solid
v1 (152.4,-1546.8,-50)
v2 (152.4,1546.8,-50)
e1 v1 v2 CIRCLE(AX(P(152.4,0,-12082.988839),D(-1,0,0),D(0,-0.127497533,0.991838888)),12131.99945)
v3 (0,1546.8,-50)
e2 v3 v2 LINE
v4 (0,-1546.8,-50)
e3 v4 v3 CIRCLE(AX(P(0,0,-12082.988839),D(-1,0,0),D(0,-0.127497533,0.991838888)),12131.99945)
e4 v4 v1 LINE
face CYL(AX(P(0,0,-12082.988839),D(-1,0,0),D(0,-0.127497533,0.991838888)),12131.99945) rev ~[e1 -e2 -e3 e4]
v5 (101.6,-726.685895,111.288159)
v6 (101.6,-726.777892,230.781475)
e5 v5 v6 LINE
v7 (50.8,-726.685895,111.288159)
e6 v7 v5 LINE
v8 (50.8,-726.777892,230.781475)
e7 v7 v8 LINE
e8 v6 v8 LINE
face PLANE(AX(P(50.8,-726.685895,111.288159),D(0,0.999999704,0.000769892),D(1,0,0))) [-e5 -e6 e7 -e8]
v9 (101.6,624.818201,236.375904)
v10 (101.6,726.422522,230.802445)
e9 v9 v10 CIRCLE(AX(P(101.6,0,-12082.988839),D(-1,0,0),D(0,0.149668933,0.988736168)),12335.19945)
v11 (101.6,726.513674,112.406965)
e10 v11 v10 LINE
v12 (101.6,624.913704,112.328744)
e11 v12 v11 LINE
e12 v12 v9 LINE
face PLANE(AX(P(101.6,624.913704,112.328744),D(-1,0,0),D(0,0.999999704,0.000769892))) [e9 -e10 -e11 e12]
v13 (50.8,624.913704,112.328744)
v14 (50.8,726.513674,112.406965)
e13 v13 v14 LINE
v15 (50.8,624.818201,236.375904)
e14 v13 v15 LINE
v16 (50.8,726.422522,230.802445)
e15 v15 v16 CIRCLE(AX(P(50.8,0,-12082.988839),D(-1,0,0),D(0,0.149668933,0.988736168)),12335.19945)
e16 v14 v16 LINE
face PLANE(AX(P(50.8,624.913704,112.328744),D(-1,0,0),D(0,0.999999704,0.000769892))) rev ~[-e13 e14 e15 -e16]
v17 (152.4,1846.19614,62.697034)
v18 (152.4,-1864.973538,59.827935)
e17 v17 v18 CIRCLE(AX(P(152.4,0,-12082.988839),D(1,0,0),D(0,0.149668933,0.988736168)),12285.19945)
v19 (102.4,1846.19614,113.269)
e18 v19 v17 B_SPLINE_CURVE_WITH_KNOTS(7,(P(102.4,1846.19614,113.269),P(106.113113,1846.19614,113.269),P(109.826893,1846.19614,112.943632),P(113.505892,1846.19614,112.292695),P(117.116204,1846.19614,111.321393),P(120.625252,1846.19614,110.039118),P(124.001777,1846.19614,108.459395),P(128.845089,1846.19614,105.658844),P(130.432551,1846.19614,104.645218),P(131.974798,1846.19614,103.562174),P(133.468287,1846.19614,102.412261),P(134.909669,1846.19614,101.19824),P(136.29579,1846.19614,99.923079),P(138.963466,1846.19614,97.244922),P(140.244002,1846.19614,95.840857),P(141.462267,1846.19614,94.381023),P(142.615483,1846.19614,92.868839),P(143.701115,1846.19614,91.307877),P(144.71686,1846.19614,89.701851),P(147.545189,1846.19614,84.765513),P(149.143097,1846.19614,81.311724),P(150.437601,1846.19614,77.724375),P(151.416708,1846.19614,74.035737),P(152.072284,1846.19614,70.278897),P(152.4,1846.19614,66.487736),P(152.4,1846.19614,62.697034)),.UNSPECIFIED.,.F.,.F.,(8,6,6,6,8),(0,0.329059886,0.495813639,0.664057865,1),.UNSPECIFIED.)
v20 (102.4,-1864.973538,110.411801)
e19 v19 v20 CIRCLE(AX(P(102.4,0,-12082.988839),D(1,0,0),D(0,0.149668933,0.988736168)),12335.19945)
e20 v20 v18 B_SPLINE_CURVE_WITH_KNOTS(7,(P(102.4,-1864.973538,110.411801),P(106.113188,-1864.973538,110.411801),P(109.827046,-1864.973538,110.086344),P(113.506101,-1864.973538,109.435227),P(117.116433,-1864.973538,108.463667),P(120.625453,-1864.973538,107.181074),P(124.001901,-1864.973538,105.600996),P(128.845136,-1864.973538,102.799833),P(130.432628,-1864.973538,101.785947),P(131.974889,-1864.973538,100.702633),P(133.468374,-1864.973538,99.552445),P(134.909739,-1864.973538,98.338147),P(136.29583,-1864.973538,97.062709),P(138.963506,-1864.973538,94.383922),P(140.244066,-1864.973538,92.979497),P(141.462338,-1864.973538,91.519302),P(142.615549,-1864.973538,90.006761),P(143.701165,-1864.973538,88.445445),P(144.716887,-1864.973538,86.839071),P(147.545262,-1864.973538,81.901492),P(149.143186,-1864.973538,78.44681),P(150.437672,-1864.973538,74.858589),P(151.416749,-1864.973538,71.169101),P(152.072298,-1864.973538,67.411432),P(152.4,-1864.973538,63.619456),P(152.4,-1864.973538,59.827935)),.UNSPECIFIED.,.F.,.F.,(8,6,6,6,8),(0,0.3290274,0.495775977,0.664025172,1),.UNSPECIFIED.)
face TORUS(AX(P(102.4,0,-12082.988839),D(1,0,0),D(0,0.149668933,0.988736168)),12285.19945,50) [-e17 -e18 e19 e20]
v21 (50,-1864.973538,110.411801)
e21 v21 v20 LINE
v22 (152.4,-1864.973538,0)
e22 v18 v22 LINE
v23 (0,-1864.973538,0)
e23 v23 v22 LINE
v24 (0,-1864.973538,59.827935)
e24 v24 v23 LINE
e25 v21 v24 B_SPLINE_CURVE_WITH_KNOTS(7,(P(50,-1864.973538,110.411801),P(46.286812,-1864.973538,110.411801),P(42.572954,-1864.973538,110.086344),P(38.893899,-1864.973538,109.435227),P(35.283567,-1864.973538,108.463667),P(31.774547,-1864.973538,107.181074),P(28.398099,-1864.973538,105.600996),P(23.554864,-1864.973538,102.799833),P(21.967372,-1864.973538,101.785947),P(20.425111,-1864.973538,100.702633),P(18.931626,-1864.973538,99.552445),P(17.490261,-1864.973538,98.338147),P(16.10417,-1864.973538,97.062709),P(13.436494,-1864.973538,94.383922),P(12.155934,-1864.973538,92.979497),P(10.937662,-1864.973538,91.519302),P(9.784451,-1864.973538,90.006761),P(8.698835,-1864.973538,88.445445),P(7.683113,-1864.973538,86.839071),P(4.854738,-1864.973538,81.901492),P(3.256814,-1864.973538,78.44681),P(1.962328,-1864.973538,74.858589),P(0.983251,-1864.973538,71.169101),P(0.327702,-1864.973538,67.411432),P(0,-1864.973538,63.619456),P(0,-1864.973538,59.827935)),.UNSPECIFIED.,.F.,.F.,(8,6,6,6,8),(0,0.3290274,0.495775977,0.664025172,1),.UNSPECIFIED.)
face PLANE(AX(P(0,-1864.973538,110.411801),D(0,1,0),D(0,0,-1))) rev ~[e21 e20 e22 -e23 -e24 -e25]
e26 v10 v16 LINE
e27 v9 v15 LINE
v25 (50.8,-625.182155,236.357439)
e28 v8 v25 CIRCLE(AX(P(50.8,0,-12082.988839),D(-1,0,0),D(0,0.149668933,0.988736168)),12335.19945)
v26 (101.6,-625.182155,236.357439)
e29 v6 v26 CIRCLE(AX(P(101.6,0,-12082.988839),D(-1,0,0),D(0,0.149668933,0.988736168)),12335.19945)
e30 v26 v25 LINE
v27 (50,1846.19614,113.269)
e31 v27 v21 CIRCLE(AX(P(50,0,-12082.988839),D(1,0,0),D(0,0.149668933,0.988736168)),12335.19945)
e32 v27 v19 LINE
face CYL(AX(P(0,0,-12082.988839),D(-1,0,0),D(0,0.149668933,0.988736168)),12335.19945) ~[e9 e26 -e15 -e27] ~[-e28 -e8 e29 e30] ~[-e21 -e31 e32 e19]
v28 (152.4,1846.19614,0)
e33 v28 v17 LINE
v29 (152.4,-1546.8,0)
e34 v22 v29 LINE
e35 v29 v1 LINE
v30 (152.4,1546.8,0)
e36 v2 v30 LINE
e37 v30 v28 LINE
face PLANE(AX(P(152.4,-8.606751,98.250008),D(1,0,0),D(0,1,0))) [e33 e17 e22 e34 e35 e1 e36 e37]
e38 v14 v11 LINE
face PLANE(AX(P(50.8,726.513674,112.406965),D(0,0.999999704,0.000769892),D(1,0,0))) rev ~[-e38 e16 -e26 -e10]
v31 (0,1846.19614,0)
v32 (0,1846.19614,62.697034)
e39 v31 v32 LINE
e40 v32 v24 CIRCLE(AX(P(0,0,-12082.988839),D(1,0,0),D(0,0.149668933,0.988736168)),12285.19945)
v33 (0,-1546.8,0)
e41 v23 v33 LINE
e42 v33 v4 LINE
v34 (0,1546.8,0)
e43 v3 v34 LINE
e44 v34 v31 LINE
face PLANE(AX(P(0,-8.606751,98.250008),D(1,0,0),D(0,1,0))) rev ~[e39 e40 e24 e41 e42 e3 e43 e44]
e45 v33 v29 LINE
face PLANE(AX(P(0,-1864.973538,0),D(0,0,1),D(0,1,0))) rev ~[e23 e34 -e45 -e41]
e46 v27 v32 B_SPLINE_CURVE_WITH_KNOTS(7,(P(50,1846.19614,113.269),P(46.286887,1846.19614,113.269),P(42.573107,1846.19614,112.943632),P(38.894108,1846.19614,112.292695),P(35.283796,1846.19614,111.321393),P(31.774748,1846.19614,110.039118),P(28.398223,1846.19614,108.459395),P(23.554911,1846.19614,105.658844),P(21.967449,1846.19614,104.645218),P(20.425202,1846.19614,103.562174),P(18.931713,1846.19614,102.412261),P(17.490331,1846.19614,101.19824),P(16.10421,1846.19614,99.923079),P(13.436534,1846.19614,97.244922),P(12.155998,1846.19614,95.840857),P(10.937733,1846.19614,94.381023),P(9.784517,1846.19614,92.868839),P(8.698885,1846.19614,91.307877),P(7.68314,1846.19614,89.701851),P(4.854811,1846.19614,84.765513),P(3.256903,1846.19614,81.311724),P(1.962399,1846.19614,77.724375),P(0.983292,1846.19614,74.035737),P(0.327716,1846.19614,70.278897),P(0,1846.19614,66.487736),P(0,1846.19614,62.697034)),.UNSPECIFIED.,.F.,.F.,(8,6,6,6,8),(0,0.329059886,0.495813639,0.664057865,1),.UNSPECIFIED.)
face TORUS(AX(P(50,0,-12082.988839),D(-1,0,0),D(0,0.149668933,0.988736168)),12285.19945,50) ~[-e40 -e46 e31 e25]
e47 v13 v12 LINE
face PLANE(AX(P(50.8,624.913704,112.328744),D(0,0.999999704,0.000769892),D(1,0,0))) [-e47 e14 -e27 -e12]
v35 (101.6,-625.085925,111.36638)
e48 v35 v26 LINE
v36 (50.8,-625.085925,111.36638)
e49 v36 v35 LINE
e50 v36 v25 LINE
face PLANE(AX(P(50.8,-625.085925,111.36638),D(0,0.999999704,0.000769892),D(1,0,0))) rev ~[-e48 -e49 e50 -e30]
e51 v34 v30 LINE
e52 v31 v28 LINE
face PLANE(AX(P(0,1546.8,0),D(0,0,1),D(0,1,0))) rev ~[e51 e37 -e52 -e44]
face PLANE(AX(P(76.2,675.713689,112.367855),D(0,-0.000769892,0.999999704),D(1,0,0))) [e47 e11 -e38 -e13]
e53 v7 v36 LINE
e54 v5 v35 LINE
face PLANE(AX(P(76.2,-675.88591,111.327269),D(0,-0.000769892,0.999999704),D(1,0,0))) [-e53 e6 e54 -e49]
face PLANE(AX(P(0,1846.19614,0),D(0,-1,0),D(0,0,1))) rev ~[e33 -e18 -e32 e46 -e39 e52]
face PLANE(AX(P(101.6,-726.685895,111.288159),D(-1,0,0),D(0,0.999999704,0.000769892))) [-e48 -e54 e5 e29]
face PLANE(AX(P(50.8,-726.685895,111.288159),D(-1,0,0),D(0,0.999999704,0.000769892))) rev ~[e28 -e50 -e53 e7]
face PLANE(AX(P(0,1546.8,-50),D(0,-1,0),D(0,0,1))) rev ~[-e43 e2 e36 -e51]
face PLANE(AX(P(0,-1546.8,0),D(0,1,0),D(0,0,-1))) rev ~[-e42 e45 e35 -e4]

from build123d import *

# Parameters (mm, degrees)
F1_DEPTH = 152.4
F2_R     = 50
F4_W     = 50.8
F4_H     = 101.6
F5_DEPTH = 152.4


with BuildPart() as f1:
    # F0 (on Right) → F1 (new body)
    with BuildSketch(Plane.YZ):
        with BuildLine():
            ThreePointArc((-1546.8, -50), (0, 49.0106103665), (1546.8, -50))
            Line((1546.8, -50), (1546.8, 0))
            Line((1546.8, 0), (1846.1961399702, 0))
            Line((1846.1961399702, 0), (1846.1961399702, 113.2689997187))
            ThreePointArc((1846.1961399702, 113.2689997187), (-9.4967662084, 252.2069546258), (-1864.9735382658, 110.4118005804))
            Line((-1864.9735382658, 110.4118005804), (-1864.9735382658, 0))
            Line((-1864.9735382658, 0), (-1546.8, 0))
            Line((-1546.8, 0), (-1546.8, -50))
        make_face()
    extrude(amount=F1_DEPTH)

    # F2
    f2_edges = [f1.edges().sort_by_distance(p)[0] for p in [
        (152.4, -9.496766, 252.206955),
        (0, -9.496766, 252.206955),
    ]]
    fillet(f2_edges, radius=F2_R)

    # F4 (on face) → F5 (cut)
    with BuildSketch(Plane(origin=(0, -0.086110522, 111.8475621363), x_dir=(1, 0, 0), z_dir=(0, -0.0007698916, 0.9999997036))):
        with Locations((76.2, -675.8)):
            Rectangle(F4_W, F4_H)
        with Locations((76.2, 675.8)):
            Rectangle(F4_W, F4_H)
    extrude(amount=F5_DEPTH, mode=Mode.SUBTRACT)


solid = f1.part
